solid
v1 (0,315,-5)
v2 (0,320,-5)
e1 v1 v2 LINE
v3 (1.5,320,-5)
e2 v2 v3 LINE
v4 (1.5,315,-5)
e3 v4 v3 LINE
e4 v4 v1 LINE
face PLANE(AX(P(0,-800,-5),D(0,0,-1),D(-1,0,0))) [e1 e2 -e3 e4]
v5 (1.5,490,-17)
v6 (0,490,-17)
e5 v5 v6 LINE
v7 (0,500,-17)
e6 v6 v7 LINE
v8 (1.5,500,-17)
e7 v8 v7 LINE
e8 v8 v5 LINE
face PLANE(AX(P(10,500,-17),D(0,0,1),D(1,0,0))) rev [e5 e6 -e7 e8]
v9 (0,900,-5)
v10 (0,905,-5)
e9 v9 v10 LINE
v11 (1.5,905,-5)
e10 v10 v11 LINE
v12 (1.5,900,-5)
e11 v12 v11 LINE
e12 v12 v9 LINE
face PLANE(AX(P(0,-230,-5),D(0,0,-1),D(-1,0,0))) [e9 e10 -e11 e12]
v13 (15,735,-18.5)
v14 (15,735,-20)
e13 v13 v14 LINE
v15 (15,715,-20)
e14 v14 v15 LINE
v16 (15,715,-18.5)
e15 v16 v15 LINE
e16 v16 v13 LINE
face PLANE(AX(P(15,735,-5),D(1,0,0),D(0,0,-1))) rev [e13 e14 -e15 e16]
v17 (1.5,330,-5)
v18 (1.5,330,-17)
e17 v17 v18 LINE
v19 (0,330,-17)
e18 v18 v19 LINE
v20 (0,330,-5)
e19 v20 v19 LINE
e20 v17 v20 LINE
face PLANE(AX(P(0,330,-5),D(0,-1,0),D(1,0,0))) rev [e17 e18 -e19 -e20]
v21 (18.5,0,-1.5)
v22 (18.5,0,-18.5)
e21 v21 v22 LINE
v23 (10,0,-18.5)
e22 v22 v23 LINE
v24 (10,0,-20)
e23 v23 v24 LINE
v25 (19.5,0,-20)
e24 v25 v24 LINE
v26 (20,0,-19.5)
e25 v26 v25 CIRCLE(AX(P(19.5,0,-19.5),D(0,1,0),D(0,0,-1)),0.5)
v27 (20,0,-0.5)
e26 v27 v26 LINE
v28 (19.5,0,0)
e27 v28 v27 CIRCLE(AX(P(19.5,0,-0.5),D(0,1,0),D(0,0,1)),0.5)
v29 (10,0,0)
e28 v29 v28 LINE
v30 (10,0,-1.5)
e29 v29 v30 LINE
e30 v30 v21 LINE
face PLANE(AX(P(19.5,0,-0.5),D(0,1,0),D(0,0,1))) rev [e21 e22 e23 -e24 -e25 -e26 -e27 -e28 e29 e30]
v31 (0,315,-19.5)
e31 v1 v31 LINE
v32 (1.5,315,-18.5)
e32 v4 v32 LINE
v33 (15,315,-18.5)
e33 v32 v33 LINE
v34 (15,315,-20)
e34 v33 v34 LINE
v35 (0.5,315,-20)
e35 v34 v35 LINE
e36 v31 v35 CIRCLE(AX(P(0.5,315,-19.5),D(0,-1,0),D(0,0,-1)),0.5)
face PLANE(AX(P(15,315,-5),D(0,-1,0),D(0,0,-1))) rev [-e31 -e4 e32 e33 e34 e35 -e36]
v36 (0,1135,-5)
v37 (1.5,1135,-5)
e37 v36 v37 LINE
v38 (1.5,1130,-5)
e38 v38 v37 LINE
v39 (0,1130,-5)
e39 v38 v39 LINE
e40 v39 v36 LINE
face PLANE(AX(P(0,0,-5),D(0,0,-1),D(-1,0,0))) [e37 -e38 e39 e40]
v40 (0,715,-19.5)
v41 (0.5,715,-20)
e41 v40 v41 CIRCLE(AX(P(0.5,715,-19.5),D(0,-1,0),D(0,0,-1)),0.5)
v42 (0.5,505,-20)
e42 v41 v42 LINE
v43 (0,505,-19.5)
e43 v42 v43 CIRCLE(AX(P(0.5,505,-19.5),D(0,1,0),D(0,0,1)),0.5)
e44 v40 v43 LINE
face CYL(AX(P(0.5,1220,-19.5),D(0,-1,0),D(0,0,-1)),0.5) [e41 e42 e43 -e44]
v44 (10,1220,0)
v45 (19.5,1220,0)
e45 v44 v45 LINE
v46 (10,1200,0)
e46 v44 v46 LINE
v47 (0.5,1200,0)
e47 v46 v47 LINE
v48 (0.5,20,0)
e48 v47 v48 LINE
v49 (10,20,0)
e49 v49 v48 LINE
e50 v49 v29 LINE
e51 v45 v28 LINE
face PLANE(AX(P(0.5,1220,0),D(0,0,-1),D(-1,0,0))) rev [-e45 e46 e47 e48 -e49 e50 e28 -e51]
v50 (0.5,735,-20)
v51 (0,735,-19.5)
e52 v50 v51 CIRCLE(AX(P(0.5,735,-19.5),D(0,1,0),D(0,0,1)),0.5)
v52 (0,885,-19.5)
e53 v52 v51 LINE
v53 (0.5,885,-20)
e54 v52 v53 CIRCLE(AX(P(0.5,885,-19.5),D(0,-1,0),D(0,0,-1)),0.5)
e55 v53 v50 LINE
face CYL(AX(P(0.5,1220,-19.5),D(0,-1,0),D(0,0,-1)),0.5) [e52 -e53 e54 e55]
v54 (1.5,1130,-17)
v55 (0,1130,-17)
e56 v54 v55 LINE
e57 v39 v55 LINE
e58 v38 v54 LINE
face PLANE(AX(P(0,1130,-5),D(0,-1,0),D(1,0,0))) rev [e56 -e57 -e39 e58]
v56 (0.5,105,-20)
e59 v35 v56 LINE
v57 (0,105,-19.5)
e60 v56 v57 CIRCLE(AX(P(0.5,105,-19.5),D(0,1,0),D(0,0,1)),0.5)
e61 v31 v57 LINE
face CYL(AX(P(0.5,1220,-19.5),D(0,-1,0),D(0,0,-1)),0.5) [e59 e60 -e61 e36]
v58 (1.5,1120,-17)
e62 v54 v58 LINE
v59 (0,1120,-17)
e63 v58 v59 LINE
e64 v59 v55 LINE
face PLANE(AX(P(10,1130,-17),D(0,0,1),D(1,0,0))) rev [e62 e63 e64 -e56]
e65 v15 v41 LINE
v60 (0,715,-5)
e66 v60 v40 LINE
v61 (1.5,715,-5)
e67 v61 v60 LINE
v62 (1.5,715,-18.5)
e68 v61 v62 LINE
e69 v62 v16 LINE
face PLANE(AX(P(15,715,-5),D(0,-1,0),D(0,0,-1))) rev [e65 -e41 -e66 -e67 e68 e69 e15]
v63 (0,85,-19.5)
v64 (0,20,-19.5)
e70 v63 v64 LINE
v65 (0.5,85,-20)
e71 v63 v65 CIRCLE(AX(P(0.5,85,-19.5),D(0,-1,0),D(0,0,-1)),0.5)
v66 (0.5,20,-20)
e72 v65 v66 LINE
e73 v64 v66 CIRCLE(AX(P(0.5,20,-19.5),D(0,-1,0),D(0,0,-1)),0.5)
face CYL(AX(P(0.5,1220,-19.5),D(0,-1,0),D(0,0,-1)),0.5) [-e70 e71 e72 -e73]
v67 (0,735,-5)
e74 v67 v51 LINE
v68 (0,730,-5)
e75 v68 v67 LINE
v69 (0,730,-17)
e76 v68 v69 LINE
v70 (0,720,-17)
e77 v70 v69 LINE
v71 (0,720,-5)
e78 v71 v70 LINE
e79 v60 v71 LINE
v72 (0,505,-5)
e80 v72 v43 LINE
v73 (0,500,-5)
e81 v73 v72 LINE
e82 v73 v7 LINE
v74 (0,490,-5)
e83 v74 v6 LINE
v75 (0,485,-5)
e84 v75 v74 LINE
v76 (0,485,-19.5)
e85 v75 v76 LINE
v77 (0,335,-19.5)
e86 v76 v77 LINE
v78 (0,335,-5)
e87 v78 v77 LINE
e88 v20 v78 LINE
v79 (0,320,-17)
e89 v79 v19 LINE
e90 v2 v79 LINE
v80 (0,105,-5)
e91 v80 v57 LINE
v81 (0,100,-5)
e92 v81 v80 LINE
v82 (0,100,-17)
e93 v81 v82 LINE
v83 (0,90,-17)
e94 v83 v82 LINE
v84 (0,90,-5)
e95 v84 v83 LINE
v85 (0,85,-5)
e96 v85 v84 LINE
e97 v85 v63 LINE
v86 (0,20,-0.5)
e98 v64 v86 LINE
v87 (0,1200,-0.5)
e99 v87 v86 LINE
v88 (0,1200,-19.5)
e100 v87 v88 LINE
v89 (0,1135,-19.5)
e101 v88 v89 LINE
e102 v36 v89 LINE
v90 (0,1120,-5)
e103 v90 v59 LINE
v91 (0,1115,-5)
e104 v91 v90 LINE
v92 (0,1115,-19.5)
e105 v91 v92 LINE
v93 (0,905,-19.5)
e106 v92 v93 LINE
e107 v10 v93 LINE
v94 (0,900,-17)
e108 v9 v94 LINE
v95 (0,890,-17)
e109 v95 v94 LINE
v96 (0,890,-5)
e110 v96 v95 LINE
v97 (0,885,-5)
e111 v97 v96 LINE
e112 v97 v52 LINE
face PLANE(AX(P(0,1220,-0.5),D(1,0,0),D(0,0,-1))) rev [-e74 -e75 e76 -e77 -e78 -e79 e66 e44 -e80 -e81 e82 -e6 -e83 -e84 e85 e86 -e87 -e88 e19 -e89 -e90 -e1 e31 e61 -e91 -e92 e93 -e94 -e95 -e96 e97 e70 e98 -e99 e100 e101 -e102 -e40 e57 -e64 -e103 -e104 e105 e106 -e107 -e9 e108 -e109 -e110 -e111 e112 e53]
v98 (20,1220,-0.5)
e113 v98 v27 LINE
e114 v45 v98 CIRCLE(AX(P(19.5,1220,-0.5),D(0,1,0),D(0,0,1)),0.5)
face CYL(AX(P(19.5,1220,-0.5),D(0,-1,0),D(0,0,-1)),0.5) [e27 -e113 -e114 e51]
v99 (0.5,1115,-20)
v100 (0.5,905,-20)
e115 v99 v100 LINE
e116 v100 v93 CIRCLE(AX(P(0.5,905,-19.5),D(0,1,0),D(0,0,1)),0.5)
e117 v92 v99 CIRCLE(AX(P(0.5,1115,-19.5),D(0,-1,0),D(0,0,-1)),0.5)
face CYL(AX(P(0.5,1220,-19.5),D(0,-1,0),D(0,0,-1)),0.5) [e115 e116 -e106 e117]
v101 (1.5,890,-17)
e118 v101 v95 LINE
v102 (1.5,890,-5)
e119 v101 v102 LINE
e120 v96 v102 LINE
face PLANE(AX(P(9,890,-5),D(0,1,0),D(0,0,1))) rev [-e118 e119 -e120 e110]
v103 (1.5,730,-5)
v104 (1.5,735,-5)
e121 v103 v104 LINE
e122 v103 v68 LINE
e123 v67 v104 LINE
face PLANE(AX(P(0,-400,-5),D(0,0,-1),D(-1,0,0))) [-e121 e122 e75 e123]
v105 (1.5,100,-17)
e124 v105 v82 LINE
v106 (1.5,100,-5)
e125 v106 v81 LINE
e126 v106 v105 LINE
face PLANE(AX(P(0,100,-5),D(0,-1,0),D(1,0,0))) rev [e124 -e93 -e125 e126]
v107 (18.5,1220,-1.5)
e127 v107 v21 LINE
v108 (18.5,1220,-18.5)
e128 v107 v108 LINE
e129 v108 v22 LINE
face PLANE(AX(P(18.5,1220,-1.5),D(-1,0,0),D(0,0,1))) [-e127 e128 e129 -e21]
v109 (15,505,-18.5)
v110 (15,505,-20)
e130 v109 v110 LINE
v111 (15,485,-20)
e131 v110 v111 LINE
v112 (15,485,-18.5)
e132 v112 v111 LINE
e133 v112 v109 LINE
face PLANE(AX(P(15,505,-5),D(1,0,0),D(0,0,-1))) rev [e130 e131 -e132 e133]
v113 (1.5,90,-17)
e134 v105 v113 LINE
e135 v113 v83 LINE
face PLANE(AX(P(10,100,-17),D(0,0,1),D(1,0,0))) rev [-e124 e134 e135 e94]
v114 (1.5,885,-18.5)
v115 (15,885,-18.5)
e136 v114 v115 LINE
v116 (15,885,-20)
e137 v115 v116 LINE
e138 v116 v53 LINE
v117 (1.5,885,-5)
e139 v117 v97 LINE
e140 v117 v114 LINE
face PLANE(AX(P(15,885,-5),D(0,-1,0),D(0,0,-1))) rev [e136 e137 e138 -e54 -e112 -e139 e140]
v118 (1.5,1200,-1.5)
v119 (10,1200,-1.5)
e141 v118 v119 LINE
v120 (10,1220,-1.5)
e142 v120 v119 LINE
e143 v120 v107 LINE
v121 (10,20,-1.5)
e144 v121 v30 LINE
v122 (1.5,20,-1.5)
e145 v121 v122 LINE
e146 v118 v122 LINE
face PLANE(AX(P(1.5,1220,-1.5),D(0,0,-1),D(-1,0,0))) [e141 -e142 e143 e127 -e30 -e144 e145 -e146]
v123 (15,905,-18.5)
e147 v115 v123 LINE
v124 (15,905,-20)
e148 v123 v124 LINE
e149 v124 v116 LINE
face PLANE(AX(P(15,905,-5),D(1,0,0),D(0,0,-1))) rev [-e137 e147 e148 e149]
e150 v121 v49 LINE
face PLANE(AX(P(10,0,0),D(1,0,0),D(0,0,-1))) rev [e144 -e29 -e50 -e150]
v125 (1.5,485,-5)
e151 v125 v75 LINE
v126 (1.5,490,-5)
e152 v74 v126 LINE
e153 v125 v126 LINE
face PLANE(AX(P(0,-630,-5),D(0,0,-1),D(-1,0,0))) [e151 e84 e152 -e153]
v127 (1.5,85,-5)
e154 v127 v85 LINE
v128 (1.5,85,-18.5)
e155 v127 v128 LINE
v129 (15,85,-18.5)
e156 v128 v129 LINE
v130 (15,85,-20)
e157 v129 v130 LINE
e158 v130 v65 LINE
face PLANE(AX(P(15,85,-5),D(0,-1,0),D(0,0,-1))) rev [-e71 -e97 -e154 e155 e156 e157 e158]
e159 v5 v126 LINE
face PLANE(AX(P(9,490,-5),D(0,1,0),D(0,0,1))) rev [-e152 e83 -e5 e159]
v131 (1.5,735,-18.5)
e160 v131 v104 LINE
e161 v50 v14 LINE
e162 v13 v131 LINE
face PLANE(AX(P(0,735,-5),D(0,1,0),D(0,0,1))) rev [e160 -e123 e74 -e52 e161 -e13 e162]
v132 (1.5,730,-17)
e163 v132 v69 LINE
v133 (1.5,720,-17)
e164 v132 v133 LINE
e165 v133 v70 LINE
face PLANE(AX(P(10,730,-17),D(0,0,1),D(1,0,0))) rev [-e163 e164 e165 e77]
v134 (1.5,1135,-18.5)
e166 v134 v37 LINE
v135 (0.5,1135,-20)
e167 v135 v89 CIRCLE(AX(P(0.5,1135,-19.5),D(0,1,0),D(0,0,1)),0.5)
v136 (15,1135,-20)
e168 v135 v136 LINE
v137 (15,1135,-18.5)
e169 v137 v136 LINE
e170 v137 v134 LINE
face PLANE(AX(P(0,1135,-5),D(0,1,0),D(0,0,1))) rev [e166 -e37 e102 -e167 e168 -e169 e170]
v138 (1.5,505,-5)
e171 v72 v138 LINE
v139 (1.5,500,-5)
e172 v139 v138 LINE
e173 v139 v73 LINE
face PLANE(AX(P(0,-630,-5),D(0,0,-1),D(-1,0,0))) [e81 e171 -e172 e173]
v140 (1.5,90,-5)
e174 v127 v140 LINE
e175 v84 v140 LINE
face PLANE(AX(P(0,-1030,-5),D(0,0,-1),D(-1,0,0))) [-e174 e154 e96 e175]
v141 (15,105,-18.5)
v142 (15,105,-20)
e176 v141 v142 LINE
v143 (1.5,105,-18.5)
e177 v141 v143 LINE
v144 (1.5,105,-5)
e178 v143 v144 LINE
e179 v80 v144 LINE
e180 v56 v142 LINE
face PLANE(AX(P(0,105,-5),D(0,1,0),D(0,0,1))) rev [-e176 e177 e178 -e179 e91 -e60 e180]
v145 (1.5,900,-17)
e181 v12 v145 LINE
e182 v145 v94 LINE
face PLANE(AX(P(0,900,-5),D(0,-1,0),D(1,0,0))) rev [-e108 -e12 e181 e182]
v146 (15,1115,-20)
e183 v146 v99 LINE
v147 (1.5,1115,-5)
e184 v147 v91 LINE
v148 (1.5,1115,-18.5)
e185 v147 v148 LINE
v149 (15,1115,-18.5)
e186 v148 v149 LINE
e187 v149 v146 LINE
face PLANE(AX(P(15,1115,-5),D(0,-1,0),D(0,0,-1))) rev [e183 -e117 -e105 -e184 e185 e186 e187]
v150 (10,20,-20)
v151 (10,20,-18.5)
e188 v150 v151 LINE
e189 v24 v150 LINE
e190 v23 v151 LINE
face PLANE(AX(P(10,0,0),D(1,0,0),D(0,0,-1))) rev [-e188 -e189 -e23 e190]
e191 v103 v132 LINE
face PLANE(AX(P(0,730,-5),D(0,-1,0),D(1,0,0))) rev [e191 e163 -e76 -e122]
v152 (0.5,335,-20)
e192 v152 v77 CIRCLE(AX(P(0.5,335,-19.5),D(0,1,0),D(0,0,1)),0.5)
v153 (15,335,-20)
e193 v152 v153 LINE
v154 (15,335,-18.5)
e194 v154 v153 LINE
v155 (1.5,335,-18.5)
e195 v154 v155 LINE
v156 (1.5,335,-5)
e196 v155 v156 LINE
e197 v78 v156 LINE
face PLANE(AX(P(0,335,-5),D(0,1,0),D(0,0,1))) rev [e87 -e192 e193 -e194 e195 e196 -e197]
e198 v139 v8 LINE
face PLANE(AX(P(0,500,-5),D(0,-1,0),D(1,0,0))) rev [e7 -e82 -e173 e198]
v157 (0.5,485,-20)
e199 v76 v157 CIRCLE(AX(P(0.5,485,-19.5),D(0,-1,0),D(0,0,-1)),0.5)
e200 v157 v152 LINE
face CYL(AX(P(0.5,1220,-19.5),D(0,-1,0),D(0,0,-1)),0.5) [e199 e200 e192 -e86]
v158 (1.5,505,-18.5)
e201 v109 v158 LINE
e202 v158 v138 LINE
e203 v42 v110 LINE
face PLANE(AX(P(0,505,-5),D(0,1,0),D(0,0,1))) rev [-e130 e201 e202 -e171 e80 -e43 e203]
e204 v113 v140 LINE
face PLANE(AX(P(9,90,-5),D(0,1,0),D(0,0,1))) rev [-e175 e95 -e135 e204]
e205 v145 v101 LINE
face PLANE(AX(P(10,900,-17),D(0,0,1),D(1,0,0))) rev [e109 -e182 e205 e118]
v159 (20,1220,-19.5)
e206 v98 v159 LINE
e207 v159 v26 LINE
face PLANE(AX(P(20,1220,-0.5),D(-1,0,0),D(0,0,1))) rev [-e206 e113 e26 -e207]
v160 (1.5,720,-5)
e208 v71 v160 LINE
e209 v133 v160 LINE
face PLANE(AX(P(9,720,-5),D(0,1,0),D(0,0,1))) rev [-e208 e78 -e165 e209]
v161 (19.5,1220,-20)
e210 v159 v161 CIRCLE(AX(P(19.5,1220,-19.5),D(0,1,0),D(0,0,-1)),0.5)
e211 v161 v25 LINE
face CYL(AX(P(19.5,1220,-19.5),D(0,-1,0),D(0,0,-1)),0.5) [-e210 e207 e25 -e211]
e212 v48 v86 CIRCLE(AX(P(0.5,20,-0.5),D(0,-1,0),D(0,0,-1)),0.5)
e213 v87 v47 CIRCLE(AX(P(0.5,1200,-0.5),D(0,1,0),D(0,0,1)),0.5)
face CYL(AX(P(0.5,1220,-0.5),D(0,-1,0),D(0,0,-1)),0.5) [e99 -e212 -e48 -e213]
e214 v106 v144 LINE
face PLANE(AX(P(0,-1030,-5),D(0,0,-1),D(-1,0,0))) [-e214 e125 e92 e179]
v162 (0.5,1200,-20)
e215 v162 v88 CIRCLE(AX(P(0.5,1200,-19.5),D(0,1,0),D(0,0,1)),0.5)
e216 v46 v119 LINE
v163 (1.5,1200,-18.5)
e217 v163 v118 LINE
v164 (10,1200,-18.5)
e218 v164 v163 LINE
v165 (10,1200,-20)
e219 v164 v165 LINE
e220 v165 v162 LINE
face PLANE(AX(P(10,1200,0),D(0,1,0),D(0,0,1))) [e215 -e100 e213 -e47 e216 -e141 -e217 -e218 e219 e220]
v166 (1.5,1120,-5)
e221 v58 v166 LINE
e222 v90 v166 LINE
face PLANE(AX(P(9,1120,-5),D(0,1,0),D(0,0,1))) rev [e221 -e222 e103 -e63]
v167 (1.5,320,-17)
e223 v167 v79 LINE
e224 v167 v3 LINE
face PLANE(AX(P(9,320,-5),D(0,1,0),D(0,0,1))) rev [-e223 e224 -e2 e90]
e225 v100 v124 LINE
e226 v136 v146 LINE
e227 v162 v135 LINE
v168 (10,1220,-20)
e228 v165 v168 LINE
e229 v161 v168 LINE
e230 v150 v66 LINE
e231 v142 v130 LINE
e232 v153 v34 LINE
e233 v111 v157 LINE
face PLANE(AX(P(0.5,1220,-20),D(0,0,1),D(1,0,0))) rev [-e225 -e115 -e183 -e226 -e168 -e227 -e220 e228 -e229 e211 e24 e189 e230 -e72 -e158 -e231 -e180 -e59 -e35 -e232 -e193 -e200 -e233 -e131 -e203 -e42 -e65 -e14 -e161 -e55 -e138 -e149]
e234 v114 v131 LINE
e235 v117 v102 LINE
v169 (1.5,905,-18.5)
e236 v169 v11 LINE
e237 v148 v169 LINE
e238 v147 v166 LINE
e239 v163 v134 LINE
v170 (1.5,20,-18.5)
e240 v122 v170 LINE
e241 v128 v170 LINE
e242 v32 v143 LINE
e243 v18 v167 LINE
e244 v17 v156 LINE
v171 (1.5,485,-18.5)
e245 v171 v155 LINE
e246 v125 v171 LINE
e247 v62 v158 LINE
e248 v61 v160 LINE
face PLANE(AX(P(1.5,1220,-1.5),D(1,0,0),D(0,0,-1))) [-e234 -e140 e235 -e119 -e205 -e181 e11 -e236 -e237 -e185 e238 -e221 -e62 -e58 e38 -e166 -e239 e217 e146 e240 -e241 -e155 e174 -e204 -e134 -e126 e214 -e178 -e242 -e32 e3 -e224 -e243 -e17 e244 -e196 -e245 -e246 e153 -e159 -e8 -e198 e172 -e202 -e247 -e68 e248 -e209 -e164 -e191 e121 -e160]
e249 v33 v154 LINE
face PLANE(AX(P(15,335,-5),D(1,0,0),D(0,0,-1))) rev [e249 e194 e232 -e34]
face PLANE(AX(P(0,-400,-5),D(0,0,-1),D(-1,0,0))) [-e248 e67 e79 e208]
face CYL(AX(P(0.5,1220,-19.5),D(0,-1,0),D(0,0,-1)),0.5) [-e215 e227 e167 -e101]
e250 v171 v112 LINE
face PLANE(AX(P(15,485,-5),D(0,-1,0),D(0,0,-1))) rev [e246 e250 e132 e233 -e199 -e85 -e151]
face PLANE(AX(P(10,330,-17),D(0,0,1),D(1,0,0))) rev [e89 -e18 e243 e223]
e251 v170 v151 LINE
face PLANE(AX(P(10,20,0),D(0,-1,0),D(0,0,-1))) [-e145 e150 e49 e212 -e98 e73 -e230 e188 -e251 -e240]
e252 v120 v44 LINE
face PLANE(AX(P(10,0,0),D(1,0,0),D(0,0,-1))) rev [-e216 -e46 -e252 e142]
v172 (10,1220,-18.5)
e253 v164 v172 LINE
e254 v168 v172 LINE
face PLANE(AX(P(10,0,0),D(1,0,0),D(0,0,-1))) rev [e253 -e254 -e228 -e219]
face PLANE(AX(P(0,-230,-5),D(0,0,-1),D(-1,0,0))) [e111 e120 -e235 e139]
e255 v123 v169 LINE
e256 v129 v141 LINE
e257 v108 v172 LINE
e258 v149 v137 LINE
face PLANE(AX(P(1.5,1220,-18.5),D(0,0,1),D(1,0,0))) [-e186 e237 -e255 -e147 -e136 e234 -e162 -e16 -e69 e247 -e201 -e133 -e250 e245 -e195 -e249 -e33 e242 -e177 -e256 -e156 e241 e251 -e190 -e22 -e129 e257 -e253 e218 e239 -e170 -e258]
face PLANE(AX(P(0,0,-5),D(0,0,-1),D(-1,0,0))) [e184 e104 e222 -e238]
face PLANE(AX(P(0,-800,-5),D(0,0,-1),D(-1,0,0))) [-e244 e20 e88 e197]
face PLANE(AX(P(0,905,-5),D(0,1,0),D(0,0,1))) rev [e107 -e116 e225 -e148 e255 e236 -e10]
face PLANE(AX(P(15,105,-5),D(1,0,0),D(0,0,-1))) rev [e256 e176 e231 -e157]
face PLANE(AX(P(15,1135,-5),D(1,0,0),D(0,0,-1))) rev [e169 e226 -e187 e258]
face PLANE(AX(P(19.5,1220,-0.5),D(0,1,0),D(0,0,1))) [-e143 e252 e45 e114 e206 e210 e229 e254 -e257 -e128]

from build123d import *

# Parameters (mm, degrees)
SKETCH1_W                   = 17
SKETCH1_H                   = 17
BOSS_EXTRUDE1_DEPTH         = 1220
CUT_EXTRUDE1_START          = -20
SKETCH2_W                   = 20
SKETCH2_H                   = 20
CUT_EXTRUDE1_DEPTH          = 10
CUT_EXTRUDE2_DEPTH          = 15
SKETCH4_W                   = 3
SKETCH4_H                   = 10
CUT_EXTRUDE3_DEPTH          = 10
SKETCH_PATTERN1_START       = -20
SKETCH_PATTERN1_DEPTH       = 15
SKETCH_PATTERN1_2_OUTLINE_W = 1.5
SKETCH_PATTERN1_2_OUTLINE_H = 10
SKETCH_PATTERN1_2_DEPTH     = 3


# Read off the part's stored shape, not the designer's step: Sketch-Pattern1
with BuildPart() as part:
    # Sketch1 → Boss-Extrude1 (new body)
    with BuildSketch(Plane(origin=(0, 0, 0), x_dir=(1, 0, 0), z_dir=(0, 1, 0))):
        with BuildLine():
            Line((0.5, 0), (19.5, 0))
            ThreePointArc((19.5, 0), (19.853553391, 0.146446609), (20, 0.5))
            Line((20, 0.5), (20, 19.5))
            ThreePointArc((20, 19.5), (19.853553391, 19.853553391), (19.5, 20))
            Line((19.5, 20), (0.5, 20))
            ThreePointArc((0.5, 20), (0.146446609, 19.853553391), (0, 19.5))
            Line((0, 19.5), (0, 0.5))
            ThreePointArc((0, 0.5), (0.146446609, 0.146446609), (0.5, 0))
        make_face()
        with Locations((10, 10)):
            Rectangle(SKETCH1_W, SKETCH1_H, mode=Mode.SUBTRACT)
    extrude(amount=BOSS_EXTRUDE1_DEPTH)

    # Sketch2 → Cut-Extrude1 (cut)
    with BuildSketch(Plane(origin=(20, 0, 0), x_dir=(0, 0, -1), z_dir=(1, 0, 0)).offset(CUT_EXTRUDE1_START)):
        with Locations((10, 1210)):
            Rectangle(SKETCH2_W, SKETCH2_H)
        with Locations((10, 10)):
            Rectangle(SKETCH2_W, SKETCH2_H)
    extrude(amount=CUT_EXTRUDE1_DEPTH, mode=Mode.SUBTRACT)

    # Sketch3 → Cut-Extrude2 (cut)
    with BuildSketch(Plane(origin=(0, 0, -20), x_dir=(-1, 0, 0), z_dir=(0, 0, -1))):
        Polygon((-15, 1115), (0, 1115), (0, 1120), (-9, 1120), (-9, 1130), (0, 1130), (0, 1135), (-15, 1135), align=None)
    extrude(amount=-CUT_EXTRUDE2_DEPTH, mode=Mode.SUBTRACT)

    # Sketch4 → Cut-Extrude3 (cut)
    with BuildSketch(Plane.ZY):
        with Locations((-18.5, 1125)):
            Rectangle(SKETCH4_W, SKETCH4_H)
    extrude(amount=-CUT_EXTRUDE3_DEPTH, mode=Mode.SUBTRACT)

    # Sketch-Pattern1 outline → Sketch-Pattern1 (cut)
    with BuildSketch(Plane.XY.offset(SKETCH_PATTERN1_START)):
        Polygon((15, 85), (15, 105), (0, 105), (0, 100), (1.5, 100), (1.5, 90), (0, 90), (0, 85), align=None)
        Polygon((1.5, 330), (1.5, 320), (0, 320), (0, 315), (15, 315), (15, 335), (0, 335), (0, 330), align=None)
        Polygon((1.5, 500), (1.5, 490), (0, 490), (0, 485), (15, 485), (15, 505), (0, 505), (0, 500), align=None)
        Polygon((1.5, 730), (1.5, 720), (0, 720), (0, 715), (15, 715), (15, 735), (0, 735), (0, 730), align=None)
        Polygon((1.5, 900), (1.5, 890), (0, 890), (0, 885), (15, 885), (15, 905), (0, 905), (0, 900), align=None)
    extrude(amount=SKETCH_PATTERN1_DEPTH, mode=Mode.SUBTRACT)

    # Sketch-Pattern1 2 outline → Sketch-Pattern1 2 (cut)
    with BuildSketch(Plane.XY.offset(SKETCH_PATTERN1_START)):
        with Locations((0.75, 95)):
            Rectangle(SKETCH_PATTERN1_2_OUTLINE_W, SKETCH_PATTERN1_2_OUTLINE_H)
        with Locations((0.75, 325)):
            Rectangle(SKETCH_PATTERN1_2_OUTLINE_W, SKETCH_PATTERN1_2_OUTLINE_H)
        with Locations((0.75, 495)):
            Rectangle(SKETCH_PATTERN1_2_OUTLINE_W, SKETCH_PATTERN1_2_OUTLINE_H)
        with Locations((0.75, 725)):
            Rectangle(SKETCH_PATTERN1_2_OUTLINE_W, SKETCH_PATTERN1_2_OUTLINE_H)
        with Locations((0.75, 895)):
            Rectangle(SKETCH_PATTERN1_2_OUTLINE_W, SKETCH_PATTERN1_2_OUTLINE_H)
    extrude(amount=SKETCH_PATTERN1_2_DEPTH, mode=Mode.SUBTRACT)


solid = part.part
